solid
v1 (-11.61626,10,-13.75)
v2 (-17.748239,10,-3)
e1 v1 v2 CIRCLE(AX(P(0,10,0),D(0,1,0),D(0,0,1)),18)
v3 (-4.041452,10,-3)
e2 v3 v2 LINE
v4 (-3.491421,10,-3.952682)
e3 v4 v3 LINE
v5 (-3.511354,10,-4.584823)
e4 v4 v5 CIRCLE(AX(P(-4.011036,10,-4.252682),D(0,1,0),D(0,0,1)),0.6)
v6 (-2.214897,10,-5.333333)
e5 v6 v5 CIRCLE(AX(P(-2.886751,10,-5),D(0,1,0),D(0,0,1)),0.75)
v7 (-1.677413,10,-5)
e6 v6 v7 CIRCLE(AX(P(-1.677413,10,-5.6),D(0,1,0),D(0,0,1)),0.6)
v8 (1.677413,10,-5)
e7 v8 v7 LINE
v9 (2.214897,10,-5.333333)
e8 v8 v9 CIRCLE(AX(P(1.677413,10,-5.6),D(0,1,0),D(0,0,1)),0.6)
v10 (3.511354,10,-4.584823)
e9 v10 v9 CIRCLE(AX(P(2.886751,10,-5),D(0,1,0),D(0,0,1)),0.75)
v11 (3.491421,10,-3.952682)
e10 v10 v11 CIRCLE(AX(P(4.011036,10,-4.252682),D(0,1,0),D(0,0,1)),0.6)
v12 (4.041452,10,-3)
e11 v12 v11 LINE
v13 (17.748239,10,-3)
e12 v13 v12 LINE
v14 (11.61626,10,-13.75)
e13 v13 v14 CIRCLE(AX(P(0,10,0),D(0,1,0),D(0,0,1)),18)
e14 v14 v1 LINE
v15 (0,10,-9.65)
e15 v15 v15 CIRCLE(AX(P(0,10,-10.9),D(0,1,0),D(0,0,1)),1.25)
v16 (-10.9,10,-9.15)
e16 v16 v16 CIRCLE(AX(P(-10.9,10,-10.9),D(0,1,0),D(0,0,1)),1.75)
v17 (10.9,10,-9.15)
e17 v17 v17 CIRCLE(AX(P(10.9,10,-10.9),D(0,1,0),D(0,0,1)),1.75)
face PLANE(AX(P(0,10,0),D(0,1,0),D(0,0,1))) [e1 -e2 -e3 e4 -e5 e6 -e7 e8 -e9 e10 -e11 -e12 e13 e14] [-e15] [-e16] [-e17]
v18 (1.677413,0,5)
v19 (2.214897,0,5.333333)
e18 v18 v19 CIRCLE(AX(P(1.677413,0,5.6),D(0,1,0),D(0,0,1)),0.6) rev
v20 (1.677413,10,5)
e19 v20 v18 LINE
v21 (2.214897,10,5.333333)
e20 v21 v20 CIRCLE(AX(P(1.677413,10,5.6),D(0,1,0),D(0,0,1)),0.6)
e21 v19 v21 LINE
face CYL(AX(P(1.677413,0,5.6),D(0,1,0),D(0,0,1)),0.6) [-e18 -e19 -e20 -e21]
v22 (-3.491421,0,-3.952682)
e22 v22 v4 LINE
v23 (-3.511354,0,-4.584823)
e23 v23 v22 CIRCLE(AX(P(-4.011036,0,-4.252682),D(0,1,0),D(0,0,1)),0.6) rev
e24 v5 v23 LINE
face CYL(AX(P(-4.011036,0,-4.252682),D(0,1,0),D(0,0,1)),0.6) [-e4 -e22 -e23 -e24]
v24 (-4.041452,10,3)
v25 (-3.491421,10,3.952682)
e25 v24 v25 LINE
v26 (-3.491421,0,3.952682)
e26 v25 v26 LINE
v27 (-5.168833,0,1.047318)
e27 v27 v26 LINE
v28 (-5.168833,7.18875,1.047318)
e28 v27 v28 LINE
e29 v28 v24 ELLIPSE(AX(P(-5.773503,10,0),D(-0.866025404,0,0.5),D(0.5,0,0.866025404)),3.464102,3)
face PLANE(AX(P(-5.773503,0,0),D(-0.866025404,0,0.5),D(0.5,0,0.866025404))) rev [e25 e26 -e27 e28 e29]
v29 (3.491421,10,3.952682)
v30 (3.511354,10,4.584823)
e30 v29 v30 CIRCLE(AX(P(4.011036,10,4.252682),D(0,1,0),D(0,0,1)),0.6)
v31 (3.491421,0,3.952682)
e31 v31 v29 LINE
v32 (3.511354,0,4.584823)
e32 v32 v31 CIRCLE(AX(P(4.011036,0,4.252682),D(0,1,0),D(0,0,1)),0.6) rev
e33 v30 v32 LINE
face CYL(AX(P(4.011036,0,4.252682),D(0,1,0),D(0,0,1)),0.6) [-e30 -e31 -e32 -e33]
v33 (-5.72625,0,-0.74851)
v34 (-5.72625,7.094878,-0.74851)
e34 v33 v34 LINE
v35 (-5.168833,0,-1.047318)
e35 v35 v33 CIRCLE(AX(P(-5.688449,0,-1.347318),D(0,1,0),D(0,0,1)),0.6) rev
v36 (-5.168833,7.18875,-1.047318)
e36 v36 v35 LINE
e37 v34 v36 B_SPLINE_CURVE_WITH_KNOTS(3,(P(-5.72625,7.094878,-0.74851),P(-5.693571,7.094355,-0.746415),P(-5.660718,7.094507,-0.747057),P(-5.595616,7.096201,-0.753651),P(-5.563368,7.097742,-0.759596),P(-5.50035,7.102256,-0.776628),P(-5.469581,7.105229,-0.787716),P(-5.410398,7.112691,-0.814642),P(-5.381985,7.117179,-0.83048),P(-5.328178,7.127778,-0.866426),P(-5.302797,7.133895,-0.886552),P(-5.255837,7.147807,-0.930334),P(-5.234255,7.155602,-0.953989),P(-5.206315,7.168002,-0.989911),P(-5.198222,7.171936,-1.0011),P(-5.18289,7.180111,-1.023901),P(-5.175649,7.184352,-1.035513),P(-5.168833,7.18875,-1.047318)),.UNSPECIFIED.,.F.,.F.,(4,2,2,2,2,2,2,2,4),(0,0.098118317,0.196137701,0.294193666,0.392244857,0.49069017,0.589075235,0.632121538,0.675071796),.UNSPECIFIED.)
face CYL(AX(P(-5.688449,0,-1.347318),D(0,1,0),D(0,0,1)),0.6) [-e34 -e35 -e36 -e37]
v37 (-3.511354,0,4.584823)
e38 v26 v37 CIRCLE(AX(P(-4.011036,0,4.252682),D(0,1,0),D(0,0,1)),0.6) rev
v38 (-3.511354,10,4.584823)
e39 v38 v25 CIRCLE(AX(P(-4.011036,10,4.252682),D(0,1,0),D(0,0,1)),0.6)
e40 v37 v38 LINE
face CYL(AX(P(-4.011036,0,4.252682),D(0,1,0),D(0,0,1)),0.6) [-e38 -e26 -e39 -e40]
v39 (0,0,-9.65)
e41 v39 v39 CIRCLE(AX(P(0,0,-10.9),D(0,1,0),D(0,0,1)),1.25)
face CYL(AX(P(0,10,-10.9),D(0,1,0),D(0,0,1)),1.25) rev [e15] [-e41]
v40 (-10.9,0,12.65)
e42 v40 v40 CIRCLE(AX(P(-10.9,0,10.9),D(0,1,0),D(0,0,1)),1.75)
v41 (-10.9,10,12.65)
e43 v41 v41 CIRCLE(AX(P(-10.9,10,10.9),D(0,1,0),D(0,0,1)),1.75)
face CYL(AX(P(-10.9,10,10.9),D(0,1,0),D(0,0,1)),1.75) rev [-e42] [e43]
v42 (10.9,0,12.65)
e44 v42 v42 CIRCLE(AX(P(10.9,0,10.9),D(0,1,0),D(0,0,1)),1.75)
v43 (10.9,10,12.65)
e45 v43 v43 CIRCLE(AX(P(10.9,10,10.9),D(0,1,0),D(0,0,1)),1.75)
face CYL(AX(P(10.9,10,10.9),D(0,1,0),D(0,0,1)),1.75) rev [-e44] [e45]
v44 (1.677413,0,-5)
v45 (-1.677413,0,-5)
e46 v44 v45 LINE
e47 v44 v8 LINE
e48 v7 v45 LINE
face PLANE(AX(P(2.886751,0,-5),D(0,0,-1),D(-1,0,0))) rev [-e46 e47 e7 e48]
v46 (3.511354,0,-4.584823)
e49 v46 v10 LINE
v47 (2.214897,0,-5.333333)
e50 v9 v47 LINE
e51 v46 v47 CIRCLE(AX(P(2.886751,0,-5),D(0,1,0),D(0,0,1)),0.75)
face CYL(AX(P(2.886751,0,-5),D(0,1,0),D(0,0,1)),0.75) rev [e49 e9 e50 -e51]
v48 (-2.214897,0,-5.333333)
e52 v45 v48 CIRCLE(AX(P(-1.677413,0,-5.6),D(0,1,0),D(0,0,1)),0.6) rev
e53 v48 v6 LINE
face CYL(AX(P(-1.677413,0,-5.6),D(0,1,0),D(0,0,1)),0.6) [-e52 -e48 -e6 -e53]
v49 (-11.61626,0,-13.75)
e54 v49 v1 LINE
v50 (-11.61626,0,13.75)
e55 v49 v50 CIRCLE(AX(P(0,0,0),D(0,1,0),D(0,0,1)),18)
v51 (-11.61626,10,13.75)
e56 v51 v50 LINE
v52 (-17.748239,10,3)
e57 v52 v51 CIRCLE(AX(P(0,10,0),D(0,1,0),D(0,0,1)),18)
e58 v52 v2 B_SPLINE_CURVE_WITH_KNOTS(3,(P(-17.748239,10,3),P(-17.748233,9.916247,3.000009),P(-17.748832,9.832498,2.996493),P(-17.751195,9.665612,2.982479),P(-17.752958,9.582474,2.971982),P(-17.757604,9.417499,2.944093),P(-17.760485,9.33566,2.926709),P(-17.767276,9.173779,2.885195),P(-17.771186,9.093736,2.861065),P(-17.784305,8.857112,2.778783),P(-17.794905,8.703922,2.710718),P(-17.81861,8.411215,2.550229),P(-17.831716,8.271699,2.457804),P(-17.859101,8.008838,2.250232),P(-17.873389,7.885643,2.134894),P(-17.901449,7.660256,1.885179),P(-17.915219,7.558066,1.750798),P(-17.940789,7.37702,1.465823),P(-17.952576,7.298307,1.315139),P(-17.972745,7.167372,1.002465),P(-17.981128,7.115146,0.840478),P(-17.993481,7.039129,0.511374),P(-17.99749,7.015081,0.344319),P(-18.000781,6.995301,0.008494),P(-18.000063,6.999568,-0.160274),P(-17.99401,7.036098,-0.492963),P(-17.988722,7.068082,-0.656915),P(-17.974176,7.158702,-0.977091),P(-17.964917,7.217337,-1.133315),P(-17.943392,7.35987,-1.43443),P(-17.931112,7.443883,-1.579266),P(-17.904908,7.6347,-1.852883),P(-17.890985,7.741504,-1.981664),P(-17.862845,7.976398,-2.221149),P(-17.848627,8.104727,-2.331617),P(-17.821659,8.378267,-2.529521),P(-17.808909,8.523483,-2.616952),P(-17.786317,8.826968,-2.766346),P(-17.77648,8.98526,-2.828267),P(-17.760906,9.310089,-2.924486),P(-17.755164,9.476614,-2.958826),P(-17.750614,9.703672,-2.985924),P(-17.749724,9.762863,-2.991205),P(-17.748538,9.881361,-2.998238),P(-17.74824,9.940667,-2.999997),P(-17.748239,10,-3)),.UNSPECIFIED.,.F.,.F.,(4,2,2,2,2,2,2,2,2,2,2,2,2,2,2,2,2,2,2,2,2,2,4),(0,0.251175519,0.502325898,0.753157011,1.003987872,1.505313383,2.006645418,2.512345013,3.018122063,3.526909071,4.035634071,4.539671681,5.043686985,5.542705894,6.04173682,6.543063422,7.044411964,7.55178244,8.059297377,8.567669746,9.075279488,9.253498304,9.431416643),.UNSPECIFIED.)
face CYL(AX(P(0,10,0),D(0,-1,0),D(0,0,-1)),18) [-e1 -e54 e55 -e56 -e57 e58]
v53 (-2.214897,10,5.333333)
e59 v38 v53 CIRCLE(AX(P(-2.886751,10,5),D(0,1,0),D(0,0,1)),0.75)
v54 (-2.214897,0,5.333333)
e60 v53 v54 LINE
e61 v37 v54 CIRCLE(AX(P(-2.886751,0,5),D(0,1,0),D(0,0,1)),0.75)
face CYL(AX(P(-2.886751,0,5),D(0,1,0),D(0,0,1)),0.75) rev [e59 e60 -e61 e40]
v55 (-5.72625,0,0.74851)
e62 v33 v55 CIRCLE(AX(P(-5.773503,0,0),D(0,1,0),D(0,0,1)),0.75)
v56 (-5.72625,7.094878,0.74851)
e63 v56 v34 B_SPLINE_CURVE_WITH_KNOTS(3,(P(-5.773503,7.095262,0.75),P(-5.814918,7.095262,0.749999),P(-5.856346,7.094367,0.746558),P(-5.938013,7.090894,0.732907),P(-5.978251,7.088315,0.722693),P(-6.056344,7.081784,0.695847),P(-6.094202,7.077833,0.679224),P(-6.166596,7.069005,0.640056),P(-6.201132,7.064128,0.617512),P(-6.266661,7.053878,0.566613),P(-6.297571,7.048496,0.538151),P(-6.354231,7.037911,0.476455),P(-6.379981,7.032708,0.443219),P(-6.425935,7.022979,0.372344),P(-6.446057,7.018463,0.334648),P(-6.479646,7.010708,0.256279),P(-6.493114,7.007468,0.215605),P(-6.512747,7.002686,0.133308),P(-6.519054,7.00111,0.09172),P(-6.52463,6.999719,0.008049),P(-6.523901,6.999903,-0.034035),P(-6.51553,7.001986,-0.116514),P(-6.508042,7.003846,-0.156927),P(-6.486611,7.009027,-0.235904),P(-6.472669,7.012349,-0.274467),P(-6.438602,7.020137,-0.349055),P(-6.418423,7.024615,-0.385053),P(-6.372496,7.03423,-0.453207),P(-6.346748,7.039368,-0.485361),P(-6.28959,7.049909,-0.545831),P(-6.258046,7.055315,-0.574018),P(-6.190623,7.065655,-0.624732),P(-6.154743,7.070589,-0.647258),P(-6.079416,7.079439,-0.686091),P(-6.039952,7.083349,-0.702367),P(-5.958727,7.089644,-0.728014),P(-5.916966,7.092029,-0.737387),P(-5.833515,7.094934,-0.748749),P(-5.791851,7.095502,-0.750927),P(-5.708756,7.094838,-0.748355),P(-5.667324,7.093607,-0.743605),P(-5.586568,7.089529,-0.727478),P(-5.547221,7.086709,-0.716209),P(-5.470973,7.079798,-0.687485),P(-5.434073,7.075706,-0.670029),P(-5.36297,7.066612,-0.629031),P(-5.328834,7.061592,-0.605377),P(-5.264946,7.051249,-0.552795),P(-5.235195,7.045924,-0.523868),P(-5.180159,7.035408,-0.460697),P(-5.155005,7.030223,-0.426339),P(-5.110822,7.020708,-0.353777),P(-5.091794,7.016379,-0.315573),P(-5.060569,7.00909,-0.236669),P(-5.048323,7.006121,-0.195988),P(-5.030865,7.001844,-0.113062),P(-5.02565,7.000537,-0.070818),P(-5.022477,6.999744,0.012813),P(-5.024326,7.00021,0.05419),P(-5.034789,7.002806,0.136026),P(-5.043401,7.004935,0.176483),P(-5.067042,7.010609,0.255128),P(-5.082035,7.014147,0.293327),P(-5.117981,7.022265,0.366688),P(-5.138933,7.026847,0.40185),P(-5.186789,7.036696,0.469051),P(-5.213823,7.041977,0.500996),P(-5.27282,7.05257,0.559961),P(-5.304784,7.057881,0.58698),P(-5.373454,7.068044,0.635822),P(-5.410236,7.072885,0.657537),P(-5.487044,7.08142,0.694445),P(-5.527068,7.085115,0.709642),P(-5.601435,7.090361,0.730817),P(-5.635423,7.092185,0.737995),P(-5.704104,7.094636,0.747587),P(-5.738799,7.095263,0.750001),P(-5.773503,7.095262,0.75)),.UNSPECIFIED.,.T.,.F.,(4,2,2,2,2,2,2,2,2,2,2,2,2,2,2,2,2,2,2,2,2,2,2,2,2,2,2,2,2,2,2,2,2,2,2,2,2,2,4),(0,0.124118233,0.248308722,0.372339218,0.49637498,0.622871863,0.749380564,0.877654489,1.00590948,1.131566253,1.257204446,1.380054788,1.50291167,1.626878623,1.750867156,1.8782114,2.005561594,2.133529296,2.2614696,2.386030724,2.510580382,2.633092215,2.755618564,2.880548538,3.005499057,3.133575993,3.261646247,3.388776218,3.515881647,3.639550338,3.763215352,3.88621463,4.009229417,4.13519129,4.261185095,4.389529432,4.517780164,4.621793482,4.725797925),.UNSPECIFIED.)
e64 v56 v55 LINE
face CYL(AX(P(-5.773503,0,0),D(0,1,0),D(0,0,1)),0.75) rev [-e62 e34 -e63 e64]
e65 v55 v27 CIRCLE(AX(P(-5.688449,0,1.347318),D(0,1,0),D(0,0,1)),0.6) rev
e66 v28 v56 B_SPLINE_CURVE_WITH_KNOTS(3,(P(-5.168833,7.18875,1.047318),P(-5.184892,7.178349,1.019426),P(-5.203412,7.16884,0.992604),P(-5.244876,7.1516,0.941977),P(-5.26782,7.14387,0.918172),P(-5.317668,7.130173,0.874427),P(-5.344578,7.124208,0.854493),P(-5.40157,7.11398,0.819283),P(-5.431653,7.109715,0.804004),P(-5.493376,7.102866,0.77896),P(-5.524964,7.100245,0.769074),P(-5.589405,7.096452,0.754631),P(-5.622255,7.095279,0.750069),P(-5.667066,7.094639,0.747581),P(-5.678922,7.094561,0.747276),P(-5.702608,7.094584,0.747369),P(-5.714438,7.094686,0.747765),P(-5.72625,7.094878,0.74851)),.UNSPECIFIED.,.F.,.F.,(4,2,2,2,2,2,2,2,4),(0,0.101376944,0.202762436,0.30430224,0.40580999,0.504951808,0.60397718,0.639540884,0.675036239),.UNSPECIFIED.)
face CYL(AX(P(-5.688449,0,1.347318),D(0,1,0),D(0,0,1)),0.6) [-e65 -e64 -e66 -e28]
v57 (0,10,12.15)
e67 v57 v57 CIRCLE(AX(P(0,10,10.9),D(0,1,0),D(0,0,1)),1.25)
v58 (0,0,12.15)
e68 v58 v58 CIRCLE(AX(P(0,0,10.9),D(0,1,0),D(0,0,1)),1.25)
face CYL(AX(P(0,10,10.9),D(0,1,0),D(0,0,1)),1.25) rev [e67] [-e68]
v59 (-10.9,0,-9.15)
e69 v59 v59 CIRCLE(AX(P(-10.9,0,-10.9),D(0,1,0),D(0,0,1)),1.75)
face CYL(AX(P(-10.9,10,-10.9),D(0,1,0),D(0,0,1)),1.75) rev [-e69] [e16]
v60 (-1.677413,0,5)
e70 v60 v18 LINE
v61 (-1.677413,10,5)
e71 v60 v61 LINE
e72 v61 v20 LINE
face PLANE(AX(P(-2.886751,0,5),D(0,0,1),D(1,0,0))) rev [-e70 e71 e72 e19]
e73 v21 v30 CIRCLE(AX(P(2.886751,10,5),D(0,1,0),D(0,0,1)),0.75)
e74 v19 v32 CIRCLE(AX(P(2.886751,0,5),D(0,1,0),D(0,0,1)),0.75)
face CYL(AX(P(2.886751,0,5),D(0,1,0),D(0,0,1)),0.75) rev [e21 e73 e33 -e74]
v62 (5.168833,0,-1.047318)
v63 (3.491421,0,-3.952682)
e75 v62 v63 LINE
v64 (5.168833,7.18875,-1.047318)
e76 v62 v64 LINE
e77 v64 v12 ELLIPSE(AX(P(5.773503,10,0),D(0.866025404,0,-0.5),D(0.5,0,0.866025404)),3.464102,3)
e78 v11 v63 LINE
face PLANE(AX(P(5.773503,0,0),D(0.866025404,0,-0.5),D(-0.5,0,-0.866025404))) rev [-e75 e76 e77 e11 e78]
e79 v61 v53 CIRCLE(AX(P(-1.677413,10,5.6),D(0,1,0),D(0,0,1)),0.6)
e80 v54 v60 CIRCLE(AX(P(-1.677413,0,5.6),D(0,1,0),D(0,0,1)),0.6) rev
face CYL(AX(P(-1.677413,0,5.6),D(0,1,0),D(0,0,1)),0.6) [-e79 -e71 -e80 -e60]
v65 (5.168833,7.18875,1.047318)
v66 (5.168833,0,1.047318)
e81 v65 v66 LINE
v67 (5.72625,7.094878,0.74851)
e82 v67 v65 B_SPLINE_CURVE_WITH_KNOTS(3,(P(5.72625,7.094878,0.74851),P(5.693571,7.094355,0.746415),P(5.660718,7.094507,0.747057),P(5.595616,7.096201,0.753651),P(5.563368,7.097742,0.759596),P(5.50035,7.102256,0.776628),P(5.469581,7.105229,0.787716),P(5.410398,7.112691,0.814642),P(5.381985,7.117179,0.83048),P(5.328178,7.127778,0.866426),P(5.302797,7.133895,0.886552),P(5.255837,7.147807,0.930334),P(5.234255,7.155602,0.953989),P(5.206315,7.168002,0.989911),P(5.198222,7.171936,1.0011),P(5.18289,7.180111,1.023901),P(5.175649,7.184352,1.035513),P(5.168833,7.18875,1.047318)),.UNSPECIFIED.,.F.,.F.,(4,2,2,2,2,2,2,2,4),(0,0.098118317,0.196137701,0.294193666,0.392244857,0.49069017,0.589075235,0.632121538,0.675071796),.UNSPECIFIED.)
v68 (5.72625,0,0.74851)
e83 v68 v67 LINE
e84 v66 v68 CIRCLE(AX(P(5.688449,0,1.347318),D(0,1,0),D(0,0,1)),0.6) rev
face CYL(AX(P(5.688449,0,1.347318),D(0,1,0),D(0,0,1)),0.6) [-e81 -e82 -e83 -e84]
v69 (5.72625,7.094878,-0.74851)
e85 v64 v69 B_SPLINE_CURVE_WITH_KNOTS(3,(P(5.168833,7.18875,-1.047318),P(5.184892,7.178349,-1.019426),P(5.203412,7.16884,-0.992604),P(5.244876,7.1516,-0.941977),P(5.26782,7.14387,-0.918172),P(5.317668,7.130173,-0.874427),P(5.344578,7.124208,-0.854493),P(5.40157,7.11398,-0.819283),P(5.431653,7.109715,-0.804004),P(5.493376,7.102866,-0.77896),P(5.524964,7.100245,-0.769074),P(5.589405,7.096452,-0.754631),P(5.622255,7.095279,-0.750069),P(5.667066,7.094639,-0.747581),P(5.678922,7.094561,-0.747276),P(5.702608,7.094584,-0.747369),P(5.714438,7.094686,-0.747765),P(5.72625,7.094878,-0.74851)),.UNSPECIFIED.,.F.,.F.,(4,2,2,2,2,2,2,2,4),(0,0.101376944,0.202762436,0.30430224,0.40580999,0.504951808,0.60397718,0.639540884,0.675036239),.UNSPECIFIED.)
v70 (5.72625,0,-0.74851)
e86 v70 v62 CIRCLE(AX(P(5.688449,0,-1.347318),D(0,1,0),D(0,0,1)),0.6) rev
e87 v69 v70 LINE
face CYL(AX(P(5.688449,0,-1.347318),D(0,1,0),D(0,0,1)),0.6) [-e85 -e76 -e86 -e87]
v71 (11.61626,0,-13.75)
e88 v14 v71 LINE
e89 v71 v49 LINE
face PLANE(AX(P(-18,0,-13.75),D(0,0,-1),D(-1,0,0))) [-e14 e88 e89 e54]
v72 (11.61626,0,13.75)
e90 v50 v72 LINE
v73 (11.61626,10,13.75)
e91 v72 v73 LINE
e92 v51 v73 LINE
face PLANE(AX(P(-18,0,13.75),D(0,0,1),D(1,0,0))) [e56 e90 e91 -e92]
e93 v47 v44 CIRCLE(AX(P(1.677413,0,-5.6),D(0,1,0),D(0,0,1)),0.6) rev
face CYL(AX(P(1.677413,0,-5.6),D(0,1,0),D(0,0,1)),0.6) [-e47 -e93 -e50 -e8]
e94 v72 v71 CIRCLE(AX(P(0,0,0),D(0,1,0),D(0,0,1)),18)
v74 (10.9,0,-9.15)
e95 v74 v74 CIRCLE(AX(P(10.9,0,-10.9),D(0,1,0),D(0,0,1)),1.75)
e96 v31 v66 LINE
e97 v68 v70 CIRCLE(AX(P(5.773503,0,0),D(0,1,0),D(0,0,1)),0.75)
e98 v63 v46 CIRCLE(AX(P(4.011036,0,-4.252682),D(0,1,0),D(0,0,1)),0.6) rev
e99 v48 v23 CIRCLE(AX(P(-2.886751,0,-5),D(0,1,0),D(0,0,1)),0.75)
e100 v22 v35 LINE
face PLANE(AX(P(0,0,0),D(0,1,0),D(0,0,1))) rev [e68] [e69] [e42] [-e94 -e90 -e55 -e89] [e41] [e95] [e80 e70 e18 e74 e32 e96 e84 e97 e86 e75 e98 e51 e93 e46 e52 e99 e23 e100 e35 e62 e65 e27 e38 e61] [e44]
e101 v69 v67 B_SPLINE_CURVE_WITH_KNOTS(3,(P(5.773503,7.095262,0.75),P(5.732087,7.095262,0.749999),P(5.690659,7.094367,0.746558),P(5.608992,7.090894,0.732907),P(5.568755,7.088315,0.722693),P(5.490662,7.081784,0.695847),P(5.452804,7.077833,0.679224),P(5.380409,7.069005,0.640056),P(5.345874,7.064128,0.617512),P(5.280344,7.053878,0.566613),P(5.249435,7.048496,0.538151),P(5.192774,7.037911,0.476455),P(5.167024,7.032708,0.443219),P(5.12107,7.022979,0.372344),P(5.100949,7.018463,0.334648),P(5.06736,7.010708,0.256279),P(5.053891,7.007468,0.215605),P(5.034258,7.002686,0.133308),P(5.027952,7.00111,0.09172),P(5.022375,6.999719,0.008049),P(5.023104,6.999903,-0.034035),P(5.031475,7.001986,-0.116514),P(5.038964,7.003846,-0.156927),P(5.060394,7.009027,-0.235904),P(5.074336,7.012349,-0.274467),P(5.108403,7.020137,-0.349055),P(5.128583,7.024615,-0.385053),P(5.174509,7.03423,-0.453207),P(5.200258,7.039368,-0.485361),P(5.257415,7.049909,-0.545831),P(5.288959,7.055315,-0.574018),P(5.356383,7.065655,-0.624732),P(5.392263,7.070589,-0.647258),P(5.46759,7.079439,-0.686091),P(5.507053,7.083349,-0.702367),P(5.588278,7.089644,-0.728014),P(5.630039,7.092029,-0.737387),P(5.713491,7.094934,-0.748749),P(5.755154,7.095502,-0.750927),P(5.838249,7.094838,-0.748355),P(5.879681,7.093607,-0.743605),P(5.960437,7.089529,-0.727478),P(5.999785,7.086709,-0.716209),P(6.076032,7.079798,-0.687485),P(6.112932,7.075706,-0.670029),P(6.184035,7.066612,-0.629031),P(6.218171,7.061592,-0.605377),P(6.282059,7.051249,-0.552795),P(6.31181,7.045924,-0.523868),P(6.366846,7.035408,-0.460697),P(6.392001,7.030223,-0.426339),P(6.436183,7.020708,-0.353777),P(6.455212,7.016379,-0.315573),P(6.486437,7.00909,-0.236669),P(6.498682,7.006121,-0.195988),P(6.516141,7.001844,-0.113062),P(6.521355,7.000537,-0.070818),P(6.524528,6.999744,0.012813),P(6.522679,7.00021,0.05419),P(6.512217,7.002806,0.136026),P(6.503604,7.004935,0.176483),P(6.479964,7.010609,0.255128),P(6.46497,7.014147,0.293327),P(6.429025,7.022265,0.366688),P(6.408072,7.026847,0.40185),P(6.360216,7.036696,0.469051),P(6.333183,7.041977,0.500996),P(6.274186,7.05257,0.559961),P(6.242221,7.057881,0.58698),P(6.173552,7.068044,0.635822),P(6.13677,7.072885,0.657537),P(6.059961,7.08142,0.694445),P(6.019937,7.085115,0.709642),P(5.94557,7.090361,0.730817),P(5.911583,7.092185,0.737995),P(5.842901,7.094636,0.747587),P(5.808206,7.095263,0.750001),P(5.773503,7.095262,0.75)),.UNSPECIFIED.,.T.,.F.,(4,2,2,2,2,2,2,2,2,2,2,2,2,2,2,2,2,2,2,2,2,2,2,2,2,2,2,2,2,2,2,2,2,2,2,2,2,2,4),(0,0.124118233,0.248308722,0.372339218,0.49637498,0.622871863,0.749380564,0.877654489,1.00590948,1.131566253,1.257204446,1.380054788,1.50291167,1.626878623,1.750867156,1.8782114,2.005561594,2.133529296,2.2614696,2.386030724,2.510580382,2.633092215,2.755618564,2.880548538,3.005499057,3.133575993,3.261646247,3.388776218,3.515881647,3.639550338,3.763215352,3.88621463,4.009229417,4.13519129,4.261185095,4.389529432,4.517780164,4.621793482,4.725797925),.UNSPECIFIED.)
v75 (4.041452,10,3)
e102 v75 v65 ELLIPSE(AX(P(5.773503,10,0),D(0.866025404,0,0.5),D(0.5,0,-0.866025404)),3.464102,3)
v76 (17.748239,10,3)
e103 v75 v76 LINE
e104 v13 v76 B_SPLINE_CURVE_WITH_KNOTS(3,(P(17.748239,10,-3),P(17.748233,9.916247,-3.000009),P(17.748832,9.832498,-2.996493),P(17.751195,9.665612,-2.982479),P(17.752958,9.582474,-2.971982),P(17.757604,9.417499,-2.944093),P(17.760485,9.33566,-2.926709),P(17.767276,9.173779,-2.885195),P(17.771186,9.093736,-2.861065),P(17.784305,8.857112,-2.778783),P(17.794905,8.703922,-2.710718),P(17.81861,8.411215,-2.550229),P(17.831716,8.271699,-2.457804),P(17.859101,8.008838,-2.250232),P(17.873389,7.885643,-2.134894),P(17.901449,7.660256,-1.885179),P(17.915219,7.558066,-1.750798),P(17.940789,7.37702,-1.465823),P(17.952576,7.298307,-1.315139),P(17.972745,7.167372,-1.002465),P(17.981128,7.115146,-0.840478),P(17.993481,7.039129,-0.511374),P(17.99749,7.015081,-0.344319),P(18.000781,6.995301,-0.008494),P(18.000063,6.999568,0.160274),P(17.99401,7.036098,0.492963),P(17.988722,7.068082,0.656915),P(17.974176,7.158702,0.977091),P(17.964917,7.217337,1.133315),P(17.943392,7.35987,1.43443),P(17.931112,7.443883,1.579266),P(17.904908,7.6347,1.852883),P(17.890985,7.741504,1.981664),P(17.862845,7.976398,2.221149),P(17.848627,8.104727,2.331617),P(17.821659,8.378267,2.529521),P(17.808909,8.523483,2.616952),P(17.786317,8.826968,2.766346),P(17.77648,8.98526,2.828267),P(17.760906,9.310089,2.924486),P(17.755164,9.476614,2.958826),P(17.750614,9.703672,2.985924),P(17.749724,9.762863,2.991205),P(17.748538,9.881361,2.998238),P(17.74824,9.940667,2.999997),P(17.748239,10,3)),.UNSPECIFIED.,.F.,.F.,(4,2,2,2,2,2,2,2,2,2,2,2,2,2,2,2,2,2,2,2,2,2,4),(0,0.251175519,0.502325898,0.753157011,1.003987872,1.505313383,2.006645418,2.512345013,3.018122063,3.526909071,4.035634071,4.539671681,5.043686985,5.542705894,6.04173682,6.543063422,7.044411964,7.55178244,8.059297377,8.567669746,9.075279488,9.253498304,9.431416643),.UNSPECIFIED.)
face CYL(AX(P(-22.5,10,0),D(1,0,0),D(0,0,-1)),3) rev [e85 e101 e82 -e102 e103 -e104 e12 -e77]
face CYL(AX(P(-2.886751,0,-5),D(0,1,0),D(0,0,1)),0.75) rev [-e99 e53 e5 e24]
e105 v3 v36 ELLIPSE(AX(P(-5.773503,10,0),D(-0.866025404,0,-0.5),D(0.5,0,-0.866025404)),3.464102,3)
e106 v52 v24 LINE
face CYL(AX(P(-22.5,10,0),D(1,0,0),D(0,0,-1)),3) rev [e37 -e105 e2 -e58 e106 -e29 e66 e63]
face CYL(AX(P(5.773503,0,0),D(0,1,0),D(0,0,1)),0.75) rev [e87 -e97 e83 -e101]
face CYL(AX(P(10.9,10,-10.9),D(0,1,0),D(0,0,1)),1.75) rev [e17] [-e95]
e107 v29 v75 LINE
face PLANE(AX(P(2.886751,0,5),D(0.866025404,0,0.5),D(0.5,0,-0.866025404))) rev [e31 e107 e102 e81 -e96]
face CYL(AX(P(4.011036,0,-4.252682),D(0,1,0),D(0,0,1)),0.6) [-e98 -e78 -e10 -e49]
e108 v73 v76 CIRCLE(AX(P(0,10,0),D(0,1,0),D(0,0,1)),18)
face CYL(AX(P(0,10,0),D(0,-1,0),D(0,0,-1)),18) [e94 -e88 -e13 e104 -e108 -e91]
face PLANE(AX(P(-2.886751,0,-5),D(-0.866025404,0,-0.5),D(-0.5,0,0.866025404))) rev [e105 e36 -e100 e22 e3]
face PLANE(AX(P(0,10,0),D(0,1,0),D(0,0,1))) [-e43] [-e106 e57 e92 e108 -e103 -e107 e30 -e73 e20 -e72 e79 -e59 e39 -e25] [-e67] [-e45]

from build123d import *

# Parameters (mm, degrees)
SKIZZE1_R                        = 18
AUFSATZ_LINEAR_AUSTRAGEN1_DEPTH  = 10
SKIZZE2_OUTSIDE_W                = 48.376
SKIZZE2_OUTSIDE_H                = 48.376
SKIZZE2_OUTSIDE_W_2              = 36
SKIZZE2_OUTSIDE_H_2              = 27.5
SCHNITT_LINEAR_AUSTRAGEN1_DEPTH  = 10
SCHNITT_LINEAR_AUSTRAGEN2_DEPTH  = 10
SKIZZE4_R                        = 3
SCHNITT_LINEAR_AUSTRAGEN3_DEPTH  = 22.5
M3_GEWINDEBOHRUNG1_D             = 2.5
F_3_5_3_5_DURCHMESSER_BOHRUNG1_D = 3.5
SKIZZE9_R                        = 0.75
SCHNITT_LINEAR_AUSTRAGEN4_DEPTH  = 10
VERRUNDUNG1_R                    = 0.6


with BuildPart() as part:
    # Skizze1 → Aufsatz-Linear austragen1 (new body)
    with BuildSketch(Plane(origin=(0, 0, 0), x_dir=(1, 0, 0), z_dir=(0, 1, 0))):
        with Locations(Location((0, 0, 0), (0, 0, 270))):
            Circle(SKIZZE1_R)
    extrude(amount=AUFSATZ_LINEAR_AUSTRAGEN1_DEPTH)

    # Skizze2 outside → Schnitt-Linear austragen1 (cut)
    with BuildSketch(Plane(origin=(0, 10, 0), x_dir=(1, 0, 0), z_dir=(0, 1, 0))):
        Rectangle(SKIZZE2_OUTSIDE_W, SKIZZE2_OUTSIDE_H)
        Rectangle(SKIZZE2_OUTSIDE_W_2, SKIZZE2_OUTSIDE_H_2, mode=Mode.SUBTRACT)
    extrude(amount=-SCHNITT_LINEAR_AUSTRAGEN1_DEPTH, mode=Mode.SUBTRACT)

    # Skizze3 → Schnitt-Linear austragen2 (cut)
    with BuildSketch(Plane(origin=(0, 10, 0), x_dir=(1, 0, 0), z_dir=(0, 1, 0))):
        Polygon((2.886751346, 5), (-2.886751346, 5), (-5.773502692, 0), (-2.886751346, -5), (2.886751346, -5), (5.773502692, 0), align=None)
    extrude(amount=-SCHNITT_LINEAR_AUSTRAGEN2_DEPTH, mode=Mode.SUBTRACT)

    # Skizze4 → Schnitt-Linear austragen3 (cut, symmetric)
    with BuildSketch(Plane(origin=(0, 0, 0), x_dir=(0, 0, -1), z_dir=(1, 0, 0))):
        with Locations((0, 10)):
            Circle(SKIZZE4_R)
    extrude(amount=SCHNITT_LINEAR_AUSTRAGEN3_DEPTH, both=True, mode=Mode.SUBTRACT)

    # M3 Gewindebohrung1 (through all)
    with Locations(Plane(origin=(0, 10, 0), x_dir=(1, 0, 0), z_dir=(0, 1, 0))):
        with Locations((0, 10.9), (0, -10.9)):
            Hole(M3_GEWINDEBOHRUNG1_D / 2)

    # Ø3.5 (3.5) Durchmesser Bohrung1 (through all)
    with Locations(Plane(origin=(0, 10, 0), x_dir=(1, 0, 0), z_dir=(0, 1, 0))):
        with Locations((-10.9, 10.9), (10.9, 10.9), (10.9, -10.9), (-10.9, -10.9)):
            Hole(F_3_5_3_5_DURCHMESSER_BOHRUNG1_D / 2)

    # Skizze9 → Schnitt-Linear austragen4 (cut)
    with BuildSketch(Plane(origin=(0, 10, 0), x_dir=(1, 0, 0), z_dir=(0, 1, 0))):
        with Locations((-2.886751346, 5)):
            Circle(SKIZZE9_R)
        with Locations((2.886751346, 5)):
            Circle(SKIZZE9_R)
        with Locations((5.773502692, 0)):
            Circle(SKIZZE9_R)
        with Locations((2.886751346, -5)):
            Circle(SKIZZE9_R)
        with Locations((-2.886751346, -5)):
            Circle(SKIZZE9_R)
        with Locations((-5.773502692, 0)):
            Circle(SKIZZE9_R)
    extrude(amount=-SCHNITT_LINEAR_AUSTRAGEN4_DEPTH, mode=Mode.SUBTRACT)

    # Verrundung1
    # the kernel refuses this fillet: 0.6 mm, written as the material it takes off along each edge
    with BuildSketch(Plane(origin=(5.398502692, -1.148346656, -0.649519053), x_dir=(-0.4999999999999986, 0, -0.8660254037844394), z_dir=(0, 1, 0))) as verrundung1_piece_1:
        with BuildLine():
            CenterArc((0.459338662, -0.6), VERRUNDUNG1_R, 90, 63.612200039)
            ThreePointArc((-0.078145188, -0.333333333), (-0.019797593, -0.171185412), (0, 0))
            Line((0, 0), (0.459338662, 0))
        make_face()
    extrude(amount=9.367849683, mode=Mode.SUBTRACT)
    with BuildSketch(Plane(origin=(5.398502692, -1.148346656, 0.649519053), x_dir=(0.9572887202141677, 0, 0.2891337167310671), z_dir=(0, 1, 0))) as verrundung1_piece_2:
        with BuildLine():
            CenterArc((0.479319154, -0.584161925), VERRUNDUNG1_R, 103.193899981, 63.612200039)
            Line((-0.104842771, -0.447213595), (0, 0))
            ThreePointArc((0, 0), (0.171185412, -0.019797593), (0.342370824, 0))
        make_face()
    extrude(amount=9.367849683, mode=Mode.SUBTRACT)
    with BuildSketch(Plane(origin=(3.261751346, -1.148346656, 4.350480947), x_dir=(0.5000000000000002, 0, -0.8660254037844385), z_dir=(0, 1, 0)), Plane(origin=(-3.261751346, -1.148346656, -4.350480947), x_dir=(-0.5000000000000006, 0, 0.8660254037844383), z_dir=(0, 1, 0)), Plane(origin=(2.136751346, -1.148346656, -5), x_dir=(-1, 0, 0), z_dir=(0, 1, 0))) as verrundung1_piece_3:
        with BuildLine():
            CenterArc((0.459338662, -0.6), VERRUNDUNG1_R, 90, 63.612200039)
            ThreePointArc((-0.078145188, -0.333333333), (-0.019797593, -0.171185412), (0, 0))
            Line((0, 0), (0.459338662, 0))
        make_face()
    extrude(amount=12.296693311, mode=Mode.SUBTRACT)
    with BuildSketch(Plane(origin=(2.136751346, -1.148346656, 5), x_dir=(0.22824721632736691, 0, 0.9736032088272965), z_dir=(0, 1, 0)), Plane(origin=(-3.261751346, -1.148346656, 4.350480947), x_dir=(-0.7290415038868022, 0, 0.684469492096229), z_dir=(0, 1, 0)), Plane(origin=(3.261751346, -1.148346656, -4.350480947), x_dir=(0.7290415038868017, 0, -0.6844694920962296), z_dir=(0, 1, 0))) as verrundung1_piece_4:
        with BuildLine():
            CenterArc((0.479319154, -0.584161925), VERRUNDUNG1_R, 103.193899981, 63.612200039)
            Line((-0.104842771, -0.447213595), (0, 0))
            ThreePointArc((0, 0), (0.171185412, -0.019797593), (0.342370824, 0))
        make_face()
    extrude(amount=12.296693311, mode=Mode.SUBTRACT)
    with BuildSketch(Plane(origin=(-2.136751346, 11.148346656, 5), x_dir=(1, 0, 0), z_dir=(0, -1, 0))) as verrundung1_piece_5:
        with BuildLine():
            CenterArc((0.459338662, 0.6), VERRUNDUNG1_R, 206.387799961, 63.612200039)
            ThreePointArc((-0.078145188, 0.333333333), (-0.019797593, 0.171185412), (0, 0))
            Line((0, 0), (0.459338662, 0))
        make_face()
    extrude(amount=12.296693311, mode=Mode.SUBTRACT)
    with BuildSketch(Plane(origin=(-5.398502692, -1.148346656, 0.649519053), x_dir=(-0.9572887202141677, 0, 0.2891337167310672), z_dir=(0, 1, 0))) as verrundung1_piece_6:
        with BuildLine():
            CenterArc((0.479319154, 0.584161925), VERRUNDUNG1_R, 193.193899981, 63.612200039)
            Line((-0.104842771, 0.447213595), (0, 0))
            ThreePointArc((0, 0), (0.171185412, 0.019797593), (0.342370824, 0))
        make_face()
    extrude(amount=9.367849683, mode=Mode.SUBTRACT)
    with BuildSketch(Plane(origin=(-5.398502692, -1.148346656, -0.649519053), x_dir=(0.5000000000000002, 0, -0.8660254037844385), z_dir=(0, 1, 0))) as verrundung1_piece_7:
        with BuildLine():
            CenterArc((0.459338662, 0.6), VERRUNDUNG1_R, 206.387799961, 63.612200039)
            ThreePointArc((-0.078145188, 0.333333333), (-0.019797593, 0.171185412), (0, 0))
            Line((0, 0), (0.459338662, 0))
        make_face()
    extrude(amount=9.367849683, mode=Mode.SUBTRACT)
    with BuildSketch(Plane(origin=(-2.136751346, 11.148346656, -5), x_dir=(-0.22824721632736567, 0, -0.9736032088272967), z_dir=(0, -1, 0))) as verrundung1_piece_8:
        with BuildLine():
            CenterArc((0.479319154, 0.584161925), VERRUNDUNG1_R, 193.193899981, 63.612200039)
            Line((-0.104842771, 0.447213595), (0, 0))
            ThreePointArc((0, 0), (0.171185412, 0.019797593), (0.342370824, 0))
        make_face()
    extrude(amount=12.296693311, mode=Mode.SUBTRACT)


solid = part.part
